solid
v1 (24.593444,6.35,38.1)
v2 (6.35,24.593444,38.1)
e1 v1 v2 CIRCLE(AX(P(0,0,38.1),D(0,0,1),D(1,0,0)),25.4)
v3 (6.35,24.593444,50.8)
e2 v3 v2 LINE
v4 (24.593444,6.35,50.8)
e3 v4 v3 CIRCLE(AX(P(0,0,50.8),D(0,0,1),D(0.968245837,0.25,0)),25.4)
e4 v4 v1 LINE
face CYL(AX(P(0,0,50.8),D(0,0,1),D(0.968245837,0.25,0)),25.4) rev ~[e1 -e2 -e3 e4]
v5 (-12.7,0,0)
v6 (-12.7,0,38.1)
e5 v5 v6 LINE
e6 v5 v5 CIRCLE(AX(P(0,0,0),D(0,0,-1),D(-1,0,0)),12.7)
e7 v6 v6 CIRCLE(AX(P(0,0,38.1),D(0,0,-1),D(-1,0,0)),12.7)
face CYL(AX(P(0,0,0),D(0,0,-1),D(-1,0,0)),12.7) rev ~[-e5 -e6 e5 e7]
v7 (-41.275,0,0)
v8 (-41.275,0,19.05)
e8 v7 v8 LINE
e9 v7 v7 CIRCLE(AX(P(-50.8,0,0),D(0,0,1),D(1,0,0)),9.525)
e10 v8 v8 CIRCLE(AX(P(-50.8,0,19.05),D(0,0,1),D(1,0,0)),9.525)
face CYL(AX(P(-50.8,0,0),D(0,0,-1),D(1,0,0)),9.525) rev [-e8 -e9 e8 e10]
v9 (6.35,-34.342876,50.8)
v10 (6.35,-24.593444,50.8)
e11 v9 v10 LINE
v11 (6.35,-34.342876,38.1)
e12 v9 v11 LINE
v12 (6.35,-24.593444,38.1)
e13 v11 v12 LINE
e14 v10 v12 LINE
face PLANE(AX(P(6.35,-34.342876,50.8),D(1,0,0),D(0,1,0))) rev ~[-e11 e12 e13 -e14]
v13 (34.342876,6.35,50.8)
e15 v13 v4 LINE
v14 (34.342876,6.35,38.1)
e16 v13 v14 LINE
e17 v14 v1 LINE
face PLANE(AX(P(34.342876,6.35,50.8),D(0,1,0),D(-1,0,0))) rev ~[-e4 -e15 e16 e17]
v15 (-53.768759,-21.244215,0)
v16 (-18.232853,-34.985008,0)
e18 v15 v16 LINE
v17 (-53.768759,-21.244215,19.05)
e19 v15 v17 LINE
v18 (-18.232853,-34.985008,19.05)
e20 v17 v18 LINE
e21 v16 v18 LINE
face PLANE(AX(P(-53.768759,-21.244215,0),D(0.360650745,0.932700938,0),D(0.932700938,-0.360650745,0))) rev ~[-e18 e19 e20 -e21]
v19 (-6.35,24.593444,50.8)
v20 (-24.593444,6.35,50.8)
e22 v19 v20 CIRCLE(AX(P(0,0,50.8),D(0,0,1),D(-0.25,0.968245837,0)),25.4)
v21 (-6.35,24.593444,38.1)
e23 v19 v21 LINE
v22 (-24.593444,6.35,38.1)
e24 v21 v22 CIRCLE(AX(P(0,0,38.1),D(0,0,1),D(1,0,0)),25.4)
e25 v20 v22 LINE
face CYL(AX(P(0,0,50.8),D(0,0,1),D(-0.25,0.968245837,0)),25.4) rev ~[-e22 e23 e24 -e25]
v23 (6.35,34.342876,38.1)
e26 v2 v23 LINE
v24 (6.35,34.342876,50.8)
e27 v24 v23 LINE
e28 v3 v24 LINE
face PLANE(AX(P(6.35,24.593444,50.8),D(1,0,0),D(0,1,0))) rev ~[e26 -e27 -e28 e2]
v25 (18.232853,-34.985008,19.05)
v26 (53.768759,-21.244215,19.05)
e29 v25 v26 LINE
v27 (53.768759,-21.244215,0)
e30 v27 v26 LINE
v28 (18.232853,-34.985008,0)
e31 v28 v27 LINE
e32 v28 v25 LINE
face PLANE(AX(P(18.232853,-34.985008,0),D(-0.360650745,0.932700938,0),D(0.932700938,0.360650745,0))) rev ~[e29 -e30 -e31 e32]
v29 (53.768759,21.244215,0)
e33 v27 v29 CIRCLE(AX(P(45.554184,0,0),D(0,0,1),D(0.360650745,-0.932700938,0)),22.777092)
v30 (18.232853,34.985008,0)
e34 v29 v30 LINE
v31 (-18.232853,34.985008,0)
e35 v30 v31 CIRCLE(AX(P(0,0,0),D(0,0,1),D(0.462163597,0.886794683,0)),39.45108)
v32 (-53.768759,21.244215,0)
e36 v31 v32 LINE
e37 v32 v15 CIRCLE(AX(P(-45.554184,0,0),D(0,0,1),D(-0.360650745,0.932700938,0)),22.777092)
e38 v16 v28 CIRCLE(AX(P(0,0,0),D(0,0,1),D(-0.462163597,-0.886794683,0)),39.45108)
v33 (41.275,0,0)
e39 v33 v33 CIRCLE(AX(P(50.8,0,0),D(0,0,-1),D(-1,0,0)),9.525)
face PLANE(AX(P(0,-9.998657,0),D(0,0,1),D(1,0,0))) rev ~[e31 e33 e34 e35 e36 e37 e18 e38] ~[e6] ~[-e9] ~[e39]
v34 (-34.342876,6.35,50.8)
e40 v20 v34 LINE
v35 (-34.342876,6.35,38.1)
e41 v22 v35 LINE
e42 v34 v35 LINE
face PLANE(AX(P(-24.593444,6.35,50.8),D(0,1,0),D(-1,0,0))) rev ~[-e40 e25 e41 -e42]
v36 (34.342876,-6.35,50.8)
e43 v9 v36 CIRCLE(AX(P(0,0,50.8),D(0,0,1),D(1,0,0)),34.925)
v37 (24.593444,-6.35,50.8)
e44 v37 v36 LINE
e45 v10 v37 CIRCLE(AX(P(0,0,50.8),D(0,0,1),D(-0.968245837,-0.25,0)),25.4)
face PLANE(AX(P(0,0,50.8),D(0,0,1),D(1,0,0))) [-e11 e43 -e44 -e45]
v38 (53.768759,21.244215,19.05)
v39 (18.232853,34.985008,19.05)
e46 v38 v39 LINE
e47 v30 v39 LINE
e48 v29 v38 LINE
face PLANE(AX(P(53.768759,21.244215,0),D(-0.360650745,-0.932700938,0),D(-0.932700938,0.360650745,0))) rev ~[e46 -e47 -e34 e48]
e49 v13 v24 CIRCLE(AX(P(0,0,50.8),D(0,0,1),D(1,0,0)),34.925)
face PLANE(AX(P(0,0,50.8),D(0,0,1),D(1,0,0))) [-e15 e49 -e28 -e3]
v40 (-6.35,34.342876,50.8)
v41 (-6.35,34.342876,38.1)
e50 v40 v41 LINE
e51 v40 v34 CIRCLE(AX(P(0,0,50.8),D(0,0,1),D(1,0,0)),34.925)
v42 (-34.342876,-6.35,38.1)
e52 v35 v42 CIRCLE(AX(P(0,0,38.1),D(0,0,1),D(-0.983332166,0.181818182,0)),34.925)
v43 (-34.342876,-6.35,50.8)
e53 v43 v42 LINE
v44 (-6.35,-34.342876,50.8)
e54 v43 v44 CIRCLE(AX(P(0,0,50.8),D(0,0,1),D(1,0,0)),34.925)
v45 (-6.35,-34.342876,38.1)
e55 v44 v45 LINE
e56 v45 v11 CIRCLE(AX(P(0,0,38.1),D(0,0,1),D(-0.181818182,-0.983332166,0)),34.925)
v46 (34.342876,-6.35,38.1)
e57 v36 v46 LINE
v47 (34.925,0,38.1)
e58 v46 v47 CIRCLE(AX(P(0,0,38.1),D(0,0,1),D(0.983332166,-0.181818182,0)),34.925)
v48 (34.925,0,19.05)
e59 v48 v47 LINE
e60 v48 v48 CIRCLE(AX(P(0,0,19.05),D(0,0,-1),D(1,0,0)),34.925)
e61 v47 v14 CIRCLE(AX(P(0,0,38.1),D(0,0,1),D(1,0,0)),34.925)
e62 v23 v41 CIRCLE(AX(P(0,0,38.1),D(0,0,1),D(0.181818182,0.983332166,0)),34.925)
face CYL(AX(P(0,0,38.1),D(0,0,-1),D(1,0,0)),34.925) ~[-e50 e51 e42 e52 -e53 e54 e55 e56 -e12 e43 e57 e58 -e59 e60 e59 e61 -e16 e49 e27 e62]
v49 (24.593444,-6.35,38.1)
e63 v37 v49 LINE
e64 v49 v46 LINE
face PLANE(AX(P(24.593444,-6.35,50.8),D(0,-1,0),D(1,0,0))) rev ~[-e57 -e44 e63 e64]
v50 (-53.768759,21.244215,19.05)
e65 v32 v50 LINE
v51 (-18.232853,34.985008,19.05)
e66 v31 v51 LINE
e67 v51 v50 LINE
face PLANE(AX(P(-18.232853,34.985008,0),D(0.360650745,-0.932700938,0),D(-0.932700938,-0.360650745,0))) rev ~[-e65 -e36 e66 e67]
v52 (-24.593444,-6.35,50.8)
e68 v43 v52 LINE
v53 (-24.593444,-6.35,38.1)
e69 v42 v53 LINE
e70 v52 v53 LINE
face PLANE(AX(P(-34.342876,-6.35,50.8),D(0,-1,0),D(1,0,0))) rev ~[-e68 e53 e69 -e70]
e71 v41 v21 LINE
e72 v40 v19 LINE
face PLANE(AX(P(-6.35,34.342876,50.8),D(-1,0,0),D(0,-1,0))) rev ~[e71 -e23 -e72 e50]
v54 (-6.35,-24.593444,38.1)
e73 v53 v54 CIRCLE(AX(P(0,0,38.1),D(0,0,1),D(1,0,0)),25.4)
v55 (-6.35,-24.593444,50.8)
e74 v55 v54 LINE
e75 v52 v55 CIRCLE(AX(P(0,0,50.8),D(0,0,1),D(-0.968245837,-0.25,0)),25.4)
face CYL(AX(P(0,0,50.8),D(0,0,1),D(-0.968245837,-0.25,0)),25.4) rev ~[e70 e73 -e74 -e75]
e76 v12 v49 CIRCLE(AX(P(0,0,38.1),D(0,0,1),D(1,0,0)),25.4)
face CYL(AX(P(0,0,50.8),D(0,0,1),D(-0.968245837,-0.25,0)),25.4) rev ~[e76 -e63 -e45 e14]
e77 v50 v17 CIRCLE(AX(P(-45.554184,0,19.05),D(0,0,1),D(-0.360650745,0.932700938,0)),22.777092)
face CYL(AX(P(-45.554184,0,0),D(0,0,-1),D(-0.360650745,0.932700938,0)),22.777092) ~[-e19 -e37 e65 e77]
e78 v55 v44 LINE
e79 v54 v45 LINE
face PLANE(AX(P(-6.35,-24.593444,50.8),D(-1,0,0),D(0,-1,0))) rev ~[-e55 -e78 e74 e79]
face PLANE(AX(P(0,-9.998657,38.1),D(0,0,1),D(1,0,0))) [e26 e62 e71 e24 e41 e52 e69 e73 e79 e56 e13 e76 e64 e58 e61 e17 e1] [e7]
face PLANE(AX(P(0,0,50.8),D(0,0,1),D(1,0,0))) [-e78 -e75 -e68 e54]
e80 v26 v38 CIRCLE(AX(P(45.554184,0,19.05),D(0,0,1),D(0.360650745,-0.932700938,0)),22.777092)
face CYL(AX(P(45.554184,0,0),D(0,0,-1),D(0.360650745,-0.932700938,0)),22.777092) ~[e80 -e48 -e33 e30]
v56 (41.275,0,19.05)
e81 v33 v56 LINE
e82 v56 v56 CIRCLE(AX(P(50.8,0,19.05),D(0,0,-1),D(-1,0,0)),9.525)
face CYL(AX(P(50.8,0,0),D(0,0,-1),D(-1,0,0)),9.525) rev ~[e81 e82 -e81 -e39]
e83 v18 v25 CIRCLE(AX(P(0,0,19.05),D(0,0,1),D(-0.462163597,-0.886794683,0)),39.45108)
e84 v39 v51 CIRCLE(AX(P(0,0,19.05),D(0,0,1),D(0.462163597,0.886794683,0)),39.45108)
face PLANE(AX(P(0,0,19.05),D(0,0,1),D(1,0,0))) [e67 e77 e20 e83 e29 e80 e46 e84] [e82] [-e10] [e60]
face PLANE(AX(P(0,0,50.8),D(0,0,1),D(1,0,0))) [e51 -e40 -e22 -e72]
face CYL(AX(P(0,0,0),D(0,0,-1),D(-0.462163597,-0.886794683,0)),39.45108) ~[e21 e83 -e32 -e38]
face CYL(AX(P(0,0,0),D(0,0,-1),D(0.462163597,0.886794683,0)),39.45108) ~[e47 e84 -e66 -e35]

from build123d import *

# Parameters (mm, degrees)
F1_DEPTH = 19.05
F2_DEPTH = 38.1
F3_R     = 34.925
F3_R_2   = 12.7
F4_DEPTH = 12.7
F6_DEPTH = 12.7
F0_R     = 9.525
F7_DEPTH = 19.05
F8_DEPTH = 103.378
F9_DEPTH = 38.1


# Not quite as in the source:
# - a feature names something its author has since deleted; it is built from what else it names


with BuildPart() as f1:
    # F0 (on Top) → F1 (new body)
    with BuildSketch(Plane.XY):
        with BuildLine():
            ThreePointArc((-34.925, 0), (0, -34.925), (34.925, 0))
            Line((34.925, 0), (25.4, 0))
            ThreePointArc((25.4, 0), (0, -25.4), (-25.4, 0))
            Line((-25.4, 0), (-34.925, 0))
        make_face()
        with BuildLine():
            Line((25.4, 0), (34.925, 0))
            ThreePointArc((34.925, 0), (0, 34.925), (-34.925, 0))
            Line((-34.925, 0), (-25.4, 0))
            ThreePointArc((-25.4, 0), (0, 25.4), (25.4, 0))
        make_face()
    extrude(amount=F1_DEPTH)

    # F0 (on Top) → F2 (join)
    with BuildSketch(Plane.XY):
        with BuildLine():
            ThreePointArc((-34.925, 0), (0, -34.925), (34.925, 0))
            Line((34.925, 0), (25.4, 0))
            ThreePointArc((25.4, 0), (0, -25.4), (-25.4, 0))
            Line((-25.4, 0), (-34.925, 0))
        make_face()
        with BuildLine():
            Line((25.4, 0), (34.925, 0))
            ThreePointArc((34.925, 0), (0, 34.925), (-34.925, 0))
            Line((-34.925, 0), (-25.4, 0))
            ThreePointArc((-25.4, 0), (0, 25.4), (25.4, 0))
        make_face()
        with BuildLine():
            ThreePointArc((-25.4, 0), (0, -25.4), (25.4, 0))
            Line((25.4, 0), (12.7, 0))
            ThreePointArc((12.7, 0), (0, -12.7), (-12.7, 0))
            Line((-12.7, 0), (-25.4, 0))
        make_face()
        with BuildLine():
            Line((12.7, 0), (25.4, 0))
            ThreePointArc((25.4, 0), (0, 25.4), (-25.4, 0))
            Line((-25.4, 0), (-12.7, 0))
            ThreePointArc((-12.7, 0), (0, 12.7), (12.7, 0))
        make_face()
    extrude(amount=F2_DEPTH)

    # F3 (on face) → F4 (join)
    with BuildSketch(Plane.XY.offset(38.1)):
        Circle(F3_R)
        Circle(F3_R_2, mode=Mode.SUBTRACT)
    extrude(amount=F4_DEPTH)

    # F5 (on face) → F6 (cut)
    with BuildSketch(Plane.XY.offset(50.8)):
        with BuildLine():
            ThreePointArc((-24.5934442484, -6.35), (-25.4, 0), (-24.5934442484, 6.35))
            Line((-24.5934442484, 6.35), (-34.3428758988, 6.35))
            ThreePointArc((-34.3428758988, 6.35), (-34.925, 0), (-34.3428758988, -6.35))
            Line((-34.3428758988, -6.35), (-24.5934442484, -6.35))
        make_face()
        with BuildLine():
            Line((6.35, -34.3428758988), (6.35, -24.5934442484))
            ThreePointArc((6.35, -24.5934442484), (0, -25.4), (-6.35, -24.5934442484))
            Line((-6.35, -24.5934442484), (-6.35, -34.3428758988))
            ThreePointArc((-6.35, -34.3428758988), (0, -34.925), (6.35, -34.3428758988))
        make_face()
        with BuildLine():
            Line((34.3428758988, 6.35), (24.5934442484, 6.35))
            ThreePointArc((24.5934442484, 6.35), (25.1975542852, 3.2005090291), (25.4, 0))
            ThreePointArc((25.4, 0), (25.1975542852, -3.2005090291), (24.5934442484, -6.35))
            Line((24.5934442484, -6.35), (34.3428758988, -6.35))
            ThreePointArc((34.3428758988, -6.35), (34.7791644937, -3.1883133656), (34.925, 0))
            ThreePointArc((34.925, 0), (34.7791644937, 3.1883133656), (34.3428758988, 6.35))
        make_face()
        with BuildLine():
            ThreePointArc((-6.35, 24.5934442484), (0, 25.4), (6.35, 24.5934442484))
            Line((6.35, 24.5934442484), (6.35, 34.3428758988))
            ThreePointArc((6.35, 34.3428758988), (0, 34.925), (-6.35, 34.3428758988))
            Line((-6.35, 34.3428758988), (-6.35, 24.5934442484))
        make_face()
    extrude(amount=-F6_DEPTH, mode=Mode.SUBTRACT)

    # F0 (on Top) → F7 (join)
    with BuildSketch(Plane.XY):
        with BuildLine():
            Line((53.7687589873, 21.2442149995), (18.2328532376, 34.9850083733))
            ThreePointArc((18.2328532376, 34.9850083733), (0, 39.4510804423), (-18.2328532376, 34.9850083733))
            Line((-18.2328532376, 34.9850083733), (-53.7687589873, 21.2442149995))
            ThreePointArc((-53.7687589873, 21.2442149995), (-68.3312757395, 0), (-53.7687589873, -21.2442149995))
            Line((-53.7687589873, -21.2442149995), (-18.2328532376, -34.9850083733))
            ThreePointArc((-18.2328532376, -34.9850083733), (0, -39.4510804423), (18.2328532376, -34.9850083733))
            Line((18.2328532376, -34.9850083733), (53.7687589873, -21.2442149995))
            ThreePointArc((53.7687589873, -21.2442149995), (68.3312757395, 0), (53.7687589873, 21.2442149995))
        make_face()
        with Locations((-50.8, 0)):
            Circle(F0_R, mode=Mode.SUBTRACT)
        with BuildLine():
            ThreePointArc((-34.925, 0), (0, 34.925), (34.925, 0))
            ThreePointArc((34.925, 0), (0, -34.925), (-34.925, 0))
        make_face(mode=Mode.SUBTRACT)
        with BuildLine():
            ThreePointArc((60.325, 0), (50.8, -9.525), (41.275, 0))
            ThreePointArc((41.275, 0), (50.8, 9.525), (60.325, 0))
        make_face(mode=Mode.SUBTRACT)
    extrude(amount=F7_DEPTH)

    # F5 (on face) → F8 (cut)
    with BuildSketch(Plane.XY.offset(50.8)):
        with BuildLine():
            Line((6.35, 6.35), (6.35, 0))
            Line((6.35, 0), (6.35, -6.35))
            Line((6.35, -6.35), (24.5934442484, -6.35))
            ThreePointArc((24.5934442484, -6.35), (25.1975542852, -3.2005090291), (25.4, 0))
            ThreePointArc((25.4, 0), (25.1975542852, 3.2005090291), (24.5934442484, 6.35))
            Line((24.5934442484, 6.35), (6.35, 6.35))
        make_face()
        with BuildLine():
            Line((-6.35, -6.35), (-6.35, 0))
            Line((-6.35, 0), (-6.35, 6.35))
            Line((-6.35, 6.35), (-24.5934442484, 6.35))
            ThreePointArc((-24.5934442484, 6.35), (-25.4, 0), (-24.5934442484, -6.35))
            Line((-24.5934442484, -6.35), (-6.35, -6.35))
        make_face()
        with BuildLine():
            Line((-6.35, 6.35), (0, 6.35))
            Line((0, 6.35), (6.35, 6.35))
            Line((6.35, 6.35), (6.35, 24.5934442484))
            ThreePointArc((6.35, 24.5934442484), (0, 25.4), (-6.35, 24.5934442484))
            Line((-6.35, 24.5934442484), (-6.35, 6.35))
        make_face()
        with BuildLine():
            Line((6.35, -6.35), (0, -6.35))
            Line((0, -6.35), (-6.35, -6.35))
            Line((-6.35, -6.35), (-6.35, -24.5934442484))
            ThreePointArc((-6.35, -24.5934442484), (0, -25.4), (6.35, -24.5934442484))
            Line((6.35, -24.5934442484), (6.35, -6.35))
        make_face()
        with BuildLine():
            Line((6.35, 24.5934442484), (6.35, 6.35))
            Line((6.35, 6.35), (24.5934442484, 6.35))
            ThreePointArc((24.5934442484, 6.35), (17.9605122421, 17.9605122421), (6.35, 24.5934442484))
        make_face()
        with BuildLine():
            Line((24.5934442484, -6.35), (6.35, -6.35))
            Line((6.35, -6.35), (6.35, -24.5934442484))
            ThreePointArc((6.35, -24.5934442484), (17.9605122421, -17.9605122421), (24.5934442484, -6.35))
        make_face()
        with BuildLine():
            Line((-24.5934442484, 6.35), (-6.35, 6.35))
            Line((-6.35, 6.35), (-6.35, 24.5934442484))
            ThreePointArc((-6.35, 24.5934442484), (-17.9605122421, 17.9605122421), (-24.5934442484, 6.35))
        make_face()
        with BuildLine():
            Line((-6.35, -24.5934442484), (-6.35, -6.35))
            Line((-6.35, -6.35), (-24.5934442484, -6.35))
            ThreePointArc((-24.5934442484, -6.35), (-17.9605122421, -17.9605122421), (-6.35, -24.5934442484))
        make_face()
    extrude(amount=-F8_DEPTH, mode=Mode.SUBTRACT)

    # F0 (on Top) → F9 (join)
    with BuildSketch(Plane.XY):
        with BuildLine():
            ThreePointArc((-25.4, 0), (0, -25.4), (25.4, 0))
            Line((25.4, 0), (12.7, 0))
            ThreePointArc((12.7, 0), (0, -12.7), (-12.7, 0))
            Line((-12.7, 0), (-25.4, 0))
        make_face()
        with BuildLine():
            Line((12.7, 0), (25.4, 0))
            ThreePointArc((25.4, 0), (0, 25.4), (-25.4, 0))
            Line((-25.4, 0), (-12.7, 0))
            ThreePointArc((-12.7, 0), (0, 12.7), (12.7, 0))
        make_face()
    extrude(amount=F9_DEPTH)


solid = f1.part
